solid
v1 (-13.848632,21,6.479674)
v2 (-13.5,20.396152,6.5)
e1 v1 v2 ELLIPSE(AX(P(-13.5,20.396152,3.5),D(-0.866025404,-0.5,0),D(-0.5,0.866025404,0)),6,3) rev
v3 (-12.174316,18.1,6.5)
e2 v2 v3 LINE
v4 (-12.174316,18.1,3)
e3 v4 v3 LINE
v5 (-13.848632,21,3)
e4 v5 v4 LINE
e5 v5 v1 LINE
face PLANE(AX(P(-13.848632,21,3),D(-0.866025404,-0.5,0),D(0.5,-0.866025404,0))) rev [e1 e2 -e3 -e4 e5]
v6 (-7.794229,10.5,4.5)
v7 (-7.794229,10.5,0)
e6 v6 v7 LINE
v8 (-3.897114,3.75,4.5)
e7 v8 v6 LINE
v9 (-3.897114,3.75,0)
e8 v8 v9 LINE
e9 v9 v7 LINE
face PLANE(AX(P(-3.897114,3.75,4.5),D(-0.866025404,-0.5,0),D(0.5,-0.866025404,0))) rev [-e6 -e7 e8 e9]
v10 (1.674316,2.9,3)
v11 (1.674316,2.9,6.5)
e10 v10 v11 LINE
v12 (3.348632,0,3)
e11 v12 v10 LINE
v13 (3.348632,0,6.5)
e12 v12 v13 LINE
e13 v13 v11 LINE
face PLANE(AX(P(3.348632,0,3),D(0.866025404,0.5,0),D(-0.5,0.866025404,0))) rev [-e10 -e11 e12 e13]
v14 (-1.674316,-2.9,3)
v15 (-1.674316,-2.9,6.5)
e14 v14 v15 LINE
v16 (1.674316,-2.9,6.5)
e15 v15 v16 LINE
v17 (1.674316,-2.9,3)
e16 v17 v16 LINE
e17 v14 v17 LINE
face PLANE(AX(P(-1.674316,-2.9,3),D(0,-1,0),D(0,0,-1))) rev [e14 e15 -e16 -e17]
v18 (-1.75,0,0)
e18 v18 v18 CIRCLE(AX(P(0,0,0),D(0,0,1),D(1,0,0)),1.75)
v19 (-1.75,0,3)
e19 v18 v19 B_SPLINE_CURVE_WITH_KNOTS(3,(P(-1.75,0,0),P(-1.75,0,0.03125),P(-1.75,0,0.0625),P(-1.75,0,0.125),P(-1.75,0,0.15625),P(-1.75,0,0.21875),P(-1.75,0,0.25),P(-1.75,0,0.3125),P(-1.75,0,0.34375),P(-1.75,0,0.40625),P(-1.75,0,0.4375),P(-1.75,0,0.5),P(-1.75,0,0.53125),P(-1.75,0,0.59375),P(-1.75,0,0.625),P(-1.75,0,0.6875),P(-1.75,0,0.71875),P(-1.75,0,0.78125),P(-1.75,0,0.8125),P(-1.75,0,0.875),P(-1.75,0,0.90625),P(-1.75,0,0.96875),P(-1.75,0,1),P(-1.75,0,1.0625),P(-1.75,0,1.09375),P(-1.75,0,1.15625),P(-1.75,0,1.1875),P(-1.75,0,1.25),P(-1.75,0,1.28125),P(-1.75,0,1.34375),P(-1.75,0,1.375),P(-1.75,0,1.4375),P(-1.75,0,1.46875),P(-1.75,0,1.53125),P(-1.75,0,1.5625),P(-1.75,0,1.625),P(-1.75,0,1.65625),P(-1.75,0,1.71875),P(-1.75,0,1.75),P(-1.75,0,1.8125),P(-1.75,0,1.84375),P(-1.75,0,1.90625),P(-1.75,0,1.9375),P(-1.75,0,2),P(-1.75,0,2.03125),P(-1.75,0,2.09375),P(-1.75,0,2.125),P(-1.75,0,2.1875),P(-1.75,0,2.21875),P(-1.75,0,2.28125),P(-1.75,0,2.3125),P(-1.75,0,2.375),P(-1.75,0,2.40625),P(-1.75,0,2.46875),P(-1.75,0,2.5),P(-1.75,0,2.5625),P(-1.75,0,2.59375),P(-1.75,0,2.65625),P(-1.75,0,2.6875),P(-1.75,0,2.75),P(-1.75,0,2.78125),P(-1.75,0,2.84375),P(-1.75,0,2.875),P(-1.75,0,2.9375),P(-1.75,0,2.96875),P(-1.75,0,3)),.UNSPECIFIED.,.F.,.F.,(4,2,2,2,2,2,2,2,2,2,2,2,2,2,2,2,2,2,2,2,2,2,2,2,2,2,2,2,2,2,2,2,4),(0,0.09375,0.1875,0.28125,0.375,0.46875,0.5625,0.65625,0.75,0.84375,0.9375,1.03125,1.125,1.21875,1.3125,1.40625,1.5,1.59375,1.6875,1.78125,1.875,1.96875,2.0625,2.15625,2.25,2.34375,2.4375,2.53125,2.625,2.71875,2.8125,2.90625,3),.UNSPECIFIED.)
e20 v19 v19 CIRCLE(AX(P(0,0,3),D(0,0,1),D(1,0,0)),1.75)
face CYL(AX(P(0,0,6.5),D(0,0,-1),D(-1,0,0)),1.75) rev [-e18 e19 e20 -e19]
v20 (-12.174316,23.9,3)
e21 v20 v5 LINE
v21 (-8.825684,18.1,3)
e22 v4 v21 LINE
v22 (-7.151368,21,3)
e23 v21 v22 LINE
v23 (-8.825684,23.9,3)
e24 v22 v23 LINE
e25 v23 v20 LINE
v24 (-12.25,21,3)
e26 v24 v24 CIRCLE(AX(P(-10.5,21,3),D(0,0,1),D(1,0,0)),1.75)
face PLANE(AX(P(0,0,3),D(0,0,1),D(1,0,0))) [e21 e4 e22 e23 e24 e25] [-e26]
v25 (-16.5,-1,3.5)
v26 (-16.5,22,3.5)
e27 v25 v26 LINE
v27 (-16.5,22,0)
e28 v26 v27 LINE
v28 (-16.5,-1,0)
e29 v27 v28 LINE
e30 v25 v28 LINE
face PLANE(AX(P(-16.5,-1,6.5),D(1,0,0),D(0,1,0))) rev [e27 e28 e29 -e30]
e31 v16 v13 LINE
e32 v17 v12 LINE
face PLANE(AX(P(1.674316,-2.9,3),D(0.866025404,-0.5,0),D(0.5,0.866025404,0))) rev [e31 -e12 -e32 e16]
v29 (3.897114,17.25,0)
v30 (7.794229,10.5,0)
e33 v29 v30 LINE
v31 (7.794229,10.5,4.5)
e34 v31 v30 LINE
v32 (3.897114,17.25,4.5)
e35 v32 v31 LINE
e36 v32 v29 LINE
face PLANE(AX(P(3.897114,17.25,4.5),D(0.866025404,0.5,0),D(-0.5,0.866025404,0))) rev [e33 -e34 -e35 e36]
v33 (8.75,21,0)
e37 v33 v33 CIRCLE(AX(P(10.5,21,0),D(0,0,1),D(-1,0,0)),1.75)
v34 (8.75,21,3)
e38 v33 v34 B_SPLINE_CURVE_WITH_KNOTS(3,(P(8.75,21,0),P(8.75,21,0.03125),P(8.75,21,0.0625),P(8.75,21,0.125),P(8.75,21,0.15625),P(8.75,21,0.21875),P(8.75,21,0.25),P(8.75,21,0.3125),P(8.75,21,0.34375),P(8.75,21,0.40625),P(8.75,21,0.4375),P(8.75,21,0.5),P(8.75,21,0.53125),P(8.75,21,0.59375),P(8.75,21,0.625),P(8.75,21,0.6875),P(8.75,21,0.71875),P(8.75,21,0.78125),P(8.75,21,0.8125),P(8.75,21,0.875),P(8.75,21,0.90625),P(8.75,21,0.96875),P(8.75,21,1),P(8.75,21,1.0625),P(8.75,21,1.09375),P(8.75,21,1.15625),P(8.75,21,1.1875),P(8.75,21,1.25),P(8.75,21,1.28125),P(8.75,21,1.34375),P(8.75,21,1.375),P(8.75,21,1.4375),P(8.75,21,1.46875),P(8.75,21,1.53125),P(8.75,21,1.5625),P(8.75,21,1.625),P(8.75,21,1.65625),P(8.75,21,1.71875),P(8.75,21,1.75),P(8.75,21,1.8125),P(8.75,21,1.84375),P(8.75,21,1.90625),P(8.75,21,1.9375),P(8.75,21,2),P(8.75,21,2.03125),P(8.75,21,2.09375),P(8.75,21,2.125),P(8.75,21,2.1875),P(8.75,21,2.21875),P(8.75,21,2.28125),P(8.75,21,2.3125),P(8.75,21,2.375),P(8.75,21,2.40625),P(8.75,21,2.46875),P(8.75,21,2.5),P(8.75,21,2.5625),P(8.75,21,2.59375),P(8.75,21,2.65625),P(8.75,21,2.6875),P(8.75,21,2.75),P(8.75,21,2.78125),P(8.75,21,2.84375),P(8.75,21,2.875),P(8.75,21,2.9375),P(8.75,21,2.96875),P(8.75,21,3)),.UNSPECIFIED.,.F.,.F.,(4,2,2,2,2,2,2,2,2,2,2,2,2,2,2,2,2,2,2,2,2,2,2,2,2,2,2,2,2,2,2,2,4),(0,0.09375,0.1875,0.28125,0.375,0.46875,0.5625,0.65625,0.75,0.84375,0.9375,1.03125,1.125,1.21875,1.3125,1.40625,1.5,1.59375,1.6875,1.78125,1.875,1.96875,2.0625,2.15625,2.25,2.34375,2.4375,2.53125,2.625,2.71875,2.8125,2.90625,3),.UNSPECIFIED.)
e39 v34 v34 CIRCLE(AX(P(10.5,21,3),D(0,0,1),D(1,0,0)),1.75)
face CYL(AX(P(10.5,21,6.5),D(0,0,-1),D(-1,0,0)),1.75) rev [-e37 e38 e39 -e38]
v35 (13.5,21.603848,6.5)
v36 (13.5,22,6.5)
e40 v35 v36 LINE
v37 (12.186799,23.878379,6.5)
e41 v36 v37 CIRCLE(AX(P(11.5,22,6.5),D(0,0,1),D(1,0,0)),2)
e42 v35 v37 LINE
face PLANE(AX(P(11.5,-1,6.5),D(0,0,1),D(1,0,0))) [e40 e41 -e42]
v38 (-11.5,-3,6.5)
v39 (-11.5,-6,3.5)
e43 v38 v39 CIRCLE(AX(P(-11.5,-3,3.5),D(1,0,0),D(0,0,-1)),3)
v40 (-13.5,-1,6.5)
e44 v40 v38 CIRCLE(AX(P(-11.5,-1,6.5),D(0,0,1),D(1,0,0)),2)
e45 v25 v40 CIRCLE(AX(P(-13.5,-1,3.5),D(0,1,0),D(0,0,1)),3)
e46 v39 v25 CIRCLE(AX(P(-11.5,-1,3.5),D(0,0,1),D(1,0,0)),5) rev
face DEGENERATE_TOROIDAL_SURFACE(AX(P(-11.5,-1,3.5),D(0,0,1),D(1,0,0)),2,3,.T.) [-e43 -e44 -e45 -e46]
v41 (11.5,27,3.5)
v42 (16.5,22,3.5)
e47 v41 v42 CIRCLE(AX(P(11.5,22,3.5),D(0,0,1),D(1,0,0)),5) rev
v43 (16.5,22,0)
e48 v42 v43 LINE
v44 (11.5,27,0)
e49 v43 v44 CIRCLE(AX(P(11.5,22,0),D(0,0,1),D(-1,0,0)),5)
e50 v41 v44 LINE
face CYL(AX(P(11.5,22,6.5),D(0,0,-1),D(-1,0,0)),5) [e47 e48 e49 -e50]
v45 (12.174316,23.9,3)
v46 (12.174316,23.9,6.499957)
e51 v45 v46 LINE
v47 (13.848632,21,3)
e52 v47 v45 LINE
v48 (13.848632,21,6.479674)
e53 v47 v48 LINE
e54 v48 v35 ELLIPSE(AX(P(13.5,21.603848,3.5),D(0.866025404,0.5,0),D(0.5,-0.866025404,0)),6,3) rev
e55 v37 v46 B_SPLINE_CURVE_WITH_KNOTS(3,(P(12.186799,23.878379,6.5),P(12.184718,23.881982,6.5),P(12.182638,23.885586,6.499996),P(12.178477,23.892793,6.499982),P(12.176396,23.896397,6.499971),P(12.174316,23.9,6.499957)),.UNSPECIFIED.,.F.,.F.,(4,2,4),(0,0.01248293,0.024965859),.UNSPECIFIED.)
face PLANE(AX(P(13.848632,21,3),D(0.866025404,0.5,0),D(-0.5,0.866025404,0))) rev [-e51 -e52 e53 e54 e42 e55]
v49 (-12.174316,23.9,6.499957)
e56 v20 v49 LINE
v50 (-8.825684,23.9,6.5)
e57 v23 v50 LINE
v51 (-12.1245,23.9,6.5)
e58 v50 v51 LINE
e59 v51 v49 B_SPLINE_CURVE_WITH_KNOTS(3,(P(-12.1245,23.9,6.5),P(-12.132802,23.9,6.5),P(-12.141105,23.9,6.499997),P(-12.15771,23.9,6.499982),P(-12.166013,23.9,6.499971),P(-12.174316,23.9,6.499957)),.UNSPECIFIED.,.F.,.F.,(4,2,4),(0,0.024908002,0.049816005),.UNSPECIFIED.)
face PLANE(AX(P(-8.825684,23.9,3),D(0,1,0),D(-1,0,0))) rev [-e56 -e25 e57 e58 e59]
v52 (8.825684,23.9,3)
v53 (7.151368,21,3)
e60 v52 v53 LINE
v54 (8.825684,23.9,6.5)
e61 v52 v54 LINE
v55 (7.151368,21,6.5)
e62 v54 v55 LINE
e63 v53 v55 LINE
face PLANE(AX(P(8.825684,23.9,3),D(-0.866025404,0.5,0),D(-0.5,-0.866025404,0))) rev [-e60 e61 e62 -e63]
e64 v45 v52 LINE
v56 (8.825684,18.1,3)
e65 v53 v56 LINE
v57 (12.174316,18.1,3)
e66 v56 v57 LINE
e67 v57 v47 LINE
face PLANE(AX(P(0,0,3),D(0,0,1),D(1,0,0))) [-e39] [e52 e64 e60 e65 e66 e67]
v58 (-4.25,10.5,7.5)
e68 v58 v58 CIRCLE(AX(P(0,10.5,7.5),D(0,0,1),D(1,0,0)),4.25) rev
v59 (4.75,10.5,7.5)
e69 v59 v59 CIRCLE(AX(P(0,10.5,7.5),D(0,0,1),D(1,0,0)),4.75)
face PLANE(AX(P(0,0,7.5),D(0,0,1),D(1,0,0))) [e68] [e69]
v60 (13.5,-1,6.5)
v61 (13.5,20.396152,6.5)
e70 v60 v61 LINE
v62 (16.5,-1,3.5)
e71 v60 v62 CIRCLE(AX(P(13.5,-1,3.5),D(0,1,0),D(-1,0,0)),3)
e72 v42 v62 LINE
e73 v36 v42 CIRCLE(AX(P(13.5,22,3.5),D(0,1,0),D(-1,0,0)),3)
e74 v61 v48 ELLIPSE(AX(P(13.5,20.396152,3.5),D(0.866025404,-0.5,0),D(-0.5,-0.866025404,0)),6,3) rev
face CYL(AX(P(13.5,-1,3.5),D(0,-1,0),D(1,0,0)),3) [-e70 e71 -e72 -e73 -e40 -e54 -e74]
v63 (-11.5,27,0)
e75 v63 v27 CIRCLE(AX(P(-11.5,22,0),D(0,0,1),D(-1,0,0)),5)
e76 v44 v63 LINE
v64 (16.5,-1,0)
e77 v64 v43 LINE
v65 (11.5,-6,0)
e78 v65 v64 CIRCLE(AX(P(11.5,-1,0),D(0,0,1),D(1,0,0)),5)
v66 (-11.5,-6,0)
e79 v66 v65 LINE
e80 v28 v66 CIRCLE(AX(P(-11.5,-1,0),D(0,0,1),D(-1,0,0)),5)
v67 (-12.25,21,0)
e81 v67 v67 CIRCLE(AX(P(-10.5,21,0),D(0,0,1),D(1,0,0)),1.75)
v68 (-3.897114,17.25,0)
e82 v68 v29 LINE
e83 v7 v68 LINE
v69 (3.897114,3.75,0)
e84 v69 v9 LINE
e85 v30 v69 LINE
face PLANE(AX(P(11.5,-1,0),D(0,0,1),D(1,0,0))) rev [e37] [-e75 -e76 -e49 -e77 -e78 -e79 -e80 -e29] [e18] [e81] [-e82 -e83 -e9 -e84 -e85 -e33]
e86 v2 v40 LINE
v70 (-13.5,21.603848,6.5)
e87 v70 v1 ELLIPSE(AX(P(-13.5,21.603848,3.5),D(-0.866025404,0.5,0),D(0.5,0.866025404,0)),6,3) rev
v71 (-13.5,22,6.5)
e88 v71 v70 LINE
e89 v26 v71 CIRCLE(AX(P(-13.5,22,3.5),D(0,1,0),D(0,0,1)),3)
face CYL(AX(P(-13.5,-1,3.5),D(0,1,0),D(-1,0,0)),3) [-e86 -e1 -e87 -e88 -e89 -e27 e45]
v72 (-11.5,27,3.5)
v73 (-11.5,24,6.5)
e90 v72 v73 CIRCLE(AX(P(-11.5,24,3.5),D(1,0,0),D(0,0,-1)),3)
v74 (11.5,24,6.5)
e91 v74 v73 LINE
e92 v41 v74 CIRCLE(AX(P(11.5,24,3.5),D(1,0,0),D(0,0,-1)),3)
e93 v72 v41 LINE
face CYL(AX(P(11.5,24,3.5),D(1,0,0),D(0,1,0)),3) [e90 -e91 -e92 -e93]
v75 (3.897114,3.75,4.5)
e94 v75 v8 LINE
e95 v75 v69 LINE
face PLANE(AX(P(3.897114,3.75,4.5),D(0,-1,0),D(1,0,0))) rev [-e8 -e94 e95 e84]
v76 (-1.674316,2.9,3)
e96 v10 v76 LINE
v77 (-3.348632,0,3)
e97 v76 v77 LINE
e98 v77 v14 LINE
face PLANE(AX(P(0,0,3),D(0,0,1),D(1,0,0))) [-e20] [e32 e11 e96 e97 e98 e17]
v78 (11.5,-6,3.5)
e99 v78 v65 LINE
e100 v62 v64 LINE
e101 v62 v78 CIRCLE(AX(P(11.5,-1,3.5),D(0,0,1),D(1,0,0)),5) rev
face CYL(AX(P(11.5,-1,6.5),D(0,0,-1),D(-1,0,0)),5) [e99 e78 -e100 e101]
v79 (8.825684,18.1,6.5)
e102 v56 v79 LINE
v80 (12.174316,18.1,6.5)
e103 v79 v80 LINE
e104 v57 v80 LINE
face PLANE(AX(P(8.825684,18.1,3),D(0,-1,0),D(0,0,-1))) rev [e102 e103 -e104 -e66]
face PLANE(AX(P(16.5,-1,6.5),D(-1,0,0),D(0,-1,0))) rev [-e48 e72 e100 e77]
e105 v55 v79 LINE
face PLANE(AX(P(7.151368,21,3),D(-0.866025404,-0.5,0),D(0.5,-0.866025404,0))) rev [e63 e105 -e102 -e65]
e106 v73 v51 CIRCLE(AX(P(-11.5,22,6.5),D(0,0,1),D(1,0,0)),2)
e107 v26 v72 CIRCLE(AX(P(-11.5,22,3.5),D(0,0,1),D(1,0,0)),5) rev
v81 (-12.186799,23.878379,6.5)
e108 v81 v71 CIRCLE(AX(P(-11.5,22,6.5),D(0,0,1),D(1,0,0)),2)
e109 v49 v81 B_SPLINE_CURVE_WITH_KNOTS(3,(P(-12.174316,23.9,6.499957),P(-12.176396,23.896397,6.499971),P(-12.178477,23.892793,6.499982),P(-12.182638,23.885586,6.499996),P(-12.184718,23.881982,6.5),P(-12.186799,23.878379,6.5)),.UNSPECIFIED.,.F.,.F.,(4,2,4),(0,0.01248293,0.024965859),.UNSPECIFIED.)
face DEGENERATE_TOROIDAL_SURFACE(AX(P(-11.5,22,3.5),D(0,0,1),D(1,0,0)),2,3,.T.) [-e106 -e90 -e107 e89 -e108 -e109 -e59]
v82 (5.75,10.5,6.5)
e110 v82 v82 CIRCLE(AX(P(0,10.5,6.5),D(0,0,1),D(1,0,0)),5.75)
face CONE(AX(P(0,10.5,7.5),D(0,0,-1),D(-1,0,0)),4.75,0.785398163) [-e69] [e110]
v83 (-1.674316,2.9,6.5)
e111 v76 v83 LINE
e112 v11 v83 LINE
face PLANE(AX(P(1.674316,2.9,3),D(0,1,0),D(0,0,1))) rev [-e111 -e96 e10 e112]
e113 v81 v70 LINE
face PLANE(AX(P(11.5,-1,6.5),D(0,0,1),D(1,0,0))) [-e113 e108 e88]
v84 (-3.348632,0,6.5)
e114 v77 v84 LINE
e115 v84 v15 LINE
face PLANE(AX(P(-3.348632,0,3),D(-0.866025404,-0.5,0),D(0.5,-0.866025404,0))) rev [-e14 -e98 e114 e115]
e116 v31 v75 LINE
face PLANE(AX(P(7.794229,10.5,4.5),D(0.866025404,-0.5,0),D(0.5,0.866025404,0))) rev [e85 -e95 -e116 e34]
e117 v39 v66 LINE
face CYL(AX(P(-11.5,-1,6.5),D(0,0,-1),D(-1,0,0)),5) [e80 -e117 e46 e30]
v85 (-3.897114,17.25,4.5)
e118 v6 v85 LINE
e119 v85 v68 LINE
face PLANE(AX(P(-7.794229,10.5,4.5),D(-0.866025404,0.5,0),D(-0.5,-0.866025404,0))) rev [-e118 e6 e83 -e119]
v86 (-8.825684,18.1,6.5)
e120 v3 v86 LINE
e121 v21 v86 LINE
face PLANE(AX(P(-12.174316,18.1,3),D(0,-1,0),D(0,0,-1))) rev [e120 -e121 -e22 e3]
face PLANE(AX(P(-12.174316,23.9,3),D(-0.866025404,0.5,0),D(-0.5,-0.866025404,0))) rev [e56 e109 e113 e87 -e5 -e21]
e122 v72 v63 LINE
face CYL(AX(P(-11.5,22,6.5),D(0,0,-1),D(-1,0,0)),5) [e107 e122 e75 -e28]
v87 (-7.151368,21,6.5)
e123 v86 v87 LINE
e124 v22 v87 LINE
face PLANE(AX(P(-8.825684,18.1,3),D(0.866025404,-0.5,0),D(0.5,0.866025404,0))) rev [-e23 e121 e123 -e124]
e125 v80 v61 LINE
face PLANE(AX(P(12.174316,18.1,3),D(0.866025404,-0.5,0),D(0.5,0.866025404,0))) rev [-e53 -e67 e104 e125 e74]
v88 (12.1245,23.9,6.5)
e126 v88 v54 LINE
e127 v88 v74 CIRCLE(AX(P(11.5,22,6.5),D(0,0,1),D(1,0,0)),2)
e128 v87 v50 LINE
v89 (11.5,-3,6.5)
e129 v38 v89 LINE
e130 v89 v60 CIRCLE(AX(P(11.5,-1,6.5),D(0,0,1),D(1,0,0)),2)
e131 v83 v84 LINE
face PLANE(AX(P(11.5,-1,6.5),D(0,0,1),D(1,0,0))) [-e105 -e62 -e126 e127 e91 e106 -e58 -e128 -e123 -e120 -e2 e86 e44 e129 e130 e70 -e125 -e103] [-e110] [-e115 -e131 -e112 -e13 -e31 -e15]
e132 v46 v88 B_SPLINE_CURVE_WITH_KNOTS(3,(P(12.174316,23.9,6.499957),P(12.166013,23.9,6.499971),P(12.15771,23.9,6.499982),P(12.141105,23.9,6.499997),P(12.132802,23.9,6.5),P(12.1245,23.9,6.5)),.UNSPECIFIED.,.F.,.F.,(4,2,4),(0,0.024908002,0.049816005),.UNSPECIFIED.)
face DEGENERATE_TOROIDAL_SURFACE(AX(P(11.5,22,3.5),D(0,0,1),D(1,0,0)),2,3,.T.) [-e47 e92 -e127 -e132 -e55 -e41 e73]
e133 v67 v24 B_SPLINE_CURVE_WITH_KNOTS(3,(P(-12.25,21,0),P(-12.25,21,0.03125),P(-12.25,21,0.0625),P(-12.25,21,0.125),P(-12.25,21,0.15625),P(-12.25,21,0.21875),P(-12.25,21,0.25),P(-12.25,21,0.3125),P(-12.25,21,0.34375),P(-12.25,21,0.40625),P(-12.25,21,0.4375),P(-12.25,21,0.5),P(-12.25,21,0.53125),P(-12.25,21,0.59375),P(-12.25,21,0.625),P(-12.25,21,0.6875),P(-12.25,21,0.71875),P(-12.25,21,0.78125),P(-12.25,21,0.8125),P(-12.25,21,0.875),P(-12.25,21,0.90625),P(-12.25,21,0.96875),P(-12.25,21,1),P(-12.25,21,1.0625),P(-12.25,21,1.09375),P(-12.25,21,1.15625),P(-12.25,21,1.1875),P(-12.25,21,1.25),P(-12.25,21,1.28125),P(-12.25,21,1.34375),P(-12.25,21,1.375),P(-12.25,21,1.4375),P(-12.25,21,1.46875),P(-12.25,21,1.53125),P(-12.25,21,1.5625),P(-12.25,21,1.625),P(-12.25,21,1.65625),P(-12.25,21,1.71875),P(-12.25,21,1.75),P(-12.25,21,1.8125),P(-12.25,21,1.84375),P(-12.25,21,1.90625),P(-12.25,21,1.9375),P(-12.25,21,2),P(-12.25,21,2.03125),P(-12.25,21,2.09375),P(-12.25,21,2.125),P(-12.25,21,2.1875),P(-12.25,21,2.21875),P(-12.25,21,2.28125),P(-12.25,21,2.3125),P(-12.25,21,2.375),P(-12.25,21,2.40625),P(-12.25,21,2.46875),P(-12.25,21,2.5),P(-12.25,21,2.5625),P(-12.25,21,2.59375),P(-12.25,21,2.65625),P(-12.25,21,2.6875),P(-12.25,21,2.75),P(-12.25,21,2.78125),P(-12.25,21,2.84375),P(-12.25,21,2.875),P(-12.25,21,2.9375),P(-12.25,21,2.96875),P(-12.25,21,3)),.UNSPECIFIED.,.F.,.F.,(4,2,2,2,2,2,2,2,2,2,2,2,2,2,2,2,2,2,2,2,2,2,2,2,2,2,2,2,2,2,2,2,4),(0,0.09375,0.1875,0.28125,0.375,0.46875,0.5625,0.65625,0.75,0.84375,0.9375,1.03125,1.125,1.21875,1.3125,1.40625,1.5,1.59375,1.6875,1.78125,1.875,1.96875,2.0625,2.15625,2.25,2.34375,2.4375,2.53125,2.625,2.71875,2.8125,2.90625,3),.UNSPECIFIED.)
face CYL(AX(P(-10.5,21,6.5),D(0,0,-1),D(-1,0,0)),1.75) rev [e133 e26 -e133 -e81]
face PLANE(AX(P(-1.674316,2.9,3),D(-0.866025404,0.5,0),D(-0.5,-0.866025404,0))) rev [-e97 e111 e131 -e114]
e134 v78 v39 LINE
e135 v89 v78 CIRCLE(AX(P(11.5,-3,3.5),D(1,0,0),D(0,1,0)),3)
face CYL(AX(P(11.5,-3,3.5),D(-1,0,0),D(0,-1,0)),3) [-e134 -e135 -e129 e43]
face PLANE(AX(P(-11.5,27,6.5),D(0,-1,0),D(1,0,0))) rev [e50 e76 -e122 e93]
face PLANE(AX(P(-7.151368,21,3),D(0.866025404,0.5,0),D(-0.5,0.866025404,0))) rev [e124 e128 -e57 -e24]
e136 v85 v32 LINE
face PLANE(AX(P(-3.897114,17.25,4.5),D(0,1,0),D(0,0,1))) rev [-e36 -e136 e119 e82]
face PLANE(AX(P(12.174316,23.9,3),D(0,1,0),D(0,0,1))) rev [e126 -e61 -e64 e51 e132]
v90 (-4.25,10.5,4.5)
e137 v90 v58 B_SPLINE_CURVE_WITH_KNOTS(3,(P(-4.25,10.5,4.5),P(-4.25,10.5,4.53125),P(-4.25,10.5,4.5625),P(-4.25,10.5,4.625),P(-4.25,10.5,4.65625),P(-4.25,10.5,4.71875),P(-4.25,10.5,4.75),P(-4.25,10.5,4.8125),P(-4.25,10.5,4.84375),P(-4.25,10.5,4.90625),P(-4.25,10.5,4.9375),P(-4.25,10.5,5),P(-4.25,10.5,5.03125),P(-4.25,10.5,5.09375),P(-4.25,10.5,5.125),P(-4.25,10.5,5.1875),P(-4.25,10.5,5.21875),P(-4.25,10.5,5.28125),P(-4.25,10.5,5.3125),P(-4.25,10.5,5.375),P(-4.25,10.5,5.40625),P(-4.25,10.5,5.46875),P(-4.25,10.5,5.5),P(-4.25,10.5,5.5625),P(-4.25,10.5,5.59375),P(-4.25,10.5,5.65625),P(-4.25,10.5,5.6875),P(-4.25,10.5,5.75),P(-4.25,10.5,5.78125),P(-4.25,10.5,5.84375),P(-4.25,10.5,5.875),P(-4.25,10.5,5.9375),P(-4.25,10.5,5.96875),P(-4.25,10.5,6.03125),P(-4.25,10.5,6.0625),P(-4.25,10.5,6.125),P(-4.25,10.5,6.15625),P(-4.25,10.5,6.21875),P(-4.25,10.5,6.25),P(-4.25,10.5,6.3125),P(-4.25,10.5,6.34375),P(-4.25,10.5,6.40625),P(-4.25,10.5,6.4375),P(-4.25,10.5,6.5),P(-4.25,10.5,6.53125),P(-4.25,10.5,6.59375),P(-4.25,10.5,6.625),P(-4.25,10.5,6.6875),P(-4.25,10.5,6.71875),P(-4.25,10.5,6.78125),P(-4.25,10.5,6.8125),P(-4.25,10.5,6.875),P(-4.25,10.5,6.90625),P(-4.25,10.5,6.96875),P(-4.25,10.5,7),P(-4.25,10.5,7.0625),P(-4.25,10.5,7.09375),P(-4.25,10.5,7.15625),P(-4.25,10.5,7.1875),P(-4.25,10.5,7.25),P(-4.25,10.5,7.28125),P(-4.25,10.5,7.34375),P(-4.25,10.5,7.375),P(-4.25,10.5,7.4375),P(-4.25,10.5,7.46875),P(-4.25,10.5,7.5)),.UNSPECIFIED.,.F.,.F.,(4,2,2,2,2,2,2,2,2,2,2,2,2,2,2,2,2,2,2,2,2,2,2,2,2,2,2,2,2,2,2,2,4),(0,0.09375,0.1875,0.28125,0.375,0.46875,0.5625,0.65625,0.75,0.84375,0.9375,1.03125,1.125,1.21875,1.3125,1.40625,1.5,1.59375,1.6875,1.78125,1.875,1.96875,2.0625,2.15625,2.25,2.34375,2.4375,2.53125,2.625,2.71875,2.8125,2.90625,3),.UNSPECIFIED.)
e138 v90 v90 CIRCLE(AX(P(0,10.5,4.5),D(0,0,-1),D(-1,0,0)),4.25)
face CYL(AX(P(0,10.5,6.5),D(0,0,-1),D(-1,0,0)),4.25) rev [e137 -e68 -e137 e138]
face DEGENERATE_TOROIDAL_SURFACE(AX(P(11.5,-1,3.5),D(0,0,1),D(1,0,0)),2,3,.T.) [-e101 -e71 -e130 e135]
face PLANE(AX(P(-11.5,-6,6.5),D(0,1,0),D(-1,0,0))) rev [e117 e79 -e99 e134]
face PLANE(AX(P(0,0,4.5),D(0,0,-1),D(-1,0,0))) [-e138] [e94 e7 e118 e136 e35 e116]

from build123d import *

# Parameters (mm, degrees)
ESBO_O1_R                = 1.75
RESSALTO_EXTRUS_O1_DEPTH = 6.5
CORTE_EXTRUS_O1_DEPTH    = 3.5
CORTE_EXTRUS_O2_DEPTH    = 4.5
ESBO_O3_3_R              = 4.25
CORTE_EXTRUS_O3_DEPTH    = 33.30325061
ESBO_O4_R                = 5.75
ESBO_O4_R_2              = 4.25
RESSALTO_EXTRUS_O2_DEPTH = 1
CHANFRO1_SIZE            = 1
FILETE1_R                = 3


# Some blends are built 0.0001 mm under size
with BuildPart() as part:
    # Esboço1 → Ressalto-extrusão1 (new body)
    with BuildSketch(Plane.XY):
        with BuildLine():
            Line((-11.5, -6), (11.5, -6))
            ThreePointArc((11.5, -6), (15.035533906, -4.535533906), (16.5, -1))
            Line((16.5, -1), (16.5, 22))
            ThreePointArc((16.5, 22), (15.035533906, 25.535533906), (11.5, 27))
            Line((11.5, 27), (-11.5, 27))
            ThreePointArc((-11.5, 27), (-15.035533906, 25.535533906), (-16.5, 22))
            Line((-16.5, 22), (-16.5, -1))
            ThreePointArc((-16.5, -1), (-15.035533906, -4.535533906), (-11.5, -6))
        make_face()
        with Locations(Location((0, 0, 0), (0, 0, 180))):
            Circle(ESBO_O1_R, mode=Mode.SUBTRACT)
        with Locations(Location((-10.5, 21, 0), (0, 0, 180))):
            Circle(ESBO_O1_R, mode=Mode.SUBTRACT)
        with Locations(Location((10.5, 21, 0), (0, 0, 180))):
            Circle(ESBO_O1_R, mode=Mode.SUBTRACT)
    extrude(amount=RESSALTO_EXTRUS_O1_DEPTH)

    # Esboço2 → Corte-extrusão1 (cut)
    with BuildSketch(Plane.XY.offset(6.5)):
        Polygon((-12.174315781, 18.1), (-8.825684219, 18.1), (-7.151368439, 21), (-8.825684219, 23.9), (-12.174315781, 23.9), (-13.848631561, 21), align=None)
        Polygon((8.825684219, 18.1), (12.174315781, 18.1), (13.848631561, 21), (12.174315781, 23.9), (8.825684219, 23.9), (7.151368439, 21), align=None)
        Polygon((-1.674315781, 2.9), (-3.348631561, 0), (-1.674315781, -2.9), (1.674315781, -2.9), (3.348631561, 0), (1.674315781, 2.9), align=None)
    extrude(amount=-CORTE_EXTRUS_O1_DEPTH, mode=Mode.SUBTRACT)

    # Esboço3 → Corte-extrusão2 (cut)
    with BuildSketch(Plane(origin=(0, 0, 0), x_dir=(-1, 0, 0), z_dir=(0, 0, -1))):
        Polygon((3.897114317, 17.25), (-3.897114317, 17.25), (-7.794228634, 10.5), (-3.897114317, 3.75), (3.897114317, 3.75), (7.794228634, 10.5), align=None)
    extrude(amount=-CORTE_EXTRUS_O2_DEPTH, mode=Mode.SUBTRACT)

    # Esboço3<3> → Corte-extrusão3 (cut, through all)
    with BuildSketch(Plane(origin=(0, 0, 0), x_dir=(-1, 0, 0), z_dir=(0, 0, -1))):
        with Locations((0, 10.5)):
            Circle(ESBO_O3_3_R)
    extrude(amount=-CORTE_EXTRUS_O3_DEPTH, mode=Mode.SUBTRACT)

    # Esboço4 → Ressalto-extrusão2 (add)
    with BuildSketch(Plane.XY.offset(6.5)):
        with Locations((0, 10.5)):
            Circle(ESBO_O4_R)
        with Locations(Location((0, 10.5, 0), (0, 0, 180))):
            Circle(ESBO_O4_R_2, mode=Mode.SUBTRACT)
    extrude(amount=RESSALTO_EXTRUS_O2_DEPTH)

    # Chanfro1
    chanfro1_edges = [part.edges().sort_by_distance(p)[0] for p in [
        (-5.75, 10.5, 7.5),
    ]]
    chamfer(chanfro1_edges, length=CHANFRO1_SIZE - 0.0001)  # a hair under: the kernel refuses the full size

    # Filete1
    # the kernel refuses this fillet: 3 mm, written as the material it takes off along each edge
    with BuildSketch(Plane(origin=(11.5, 22, 6.5), x_dir=(1, 0, 0), z_dir=(0, -1, 0))) as filete1_piece_1:
        with BuildLine():
            CenterArc((5 - FILETE1_R, -FILETE1_R), FILETE1_R, 0, 90)
            Line((5, -FILETE1_R), (5, 0))
            Line((5, 0), (5 - FILETE1_R, 0))
        make_face()
    revolve(axis=Axis((11.5, 22, 6.5), (0, 0, 1)), revolution_arc=90, mode=Mode.SUBTRACT)
    with BuildSketch(Plane(origin=(11.5, 27, 6.5), x_dir=(0, -1, 0), z_dir=(-1, 0, 0)), Plane(origin=(-16.5, 22, 6.5), x_dir=(1, 0, 0), z_dir=(0, -1, 0)), Plane(origin=(-11.5, -6, 6.5), x_dir=(0, 1, 0), z_dir=(1, 0, 0)), Plane(origin=(16.5, -1, 6.5), x_dir=(-1, 0, 0), z_dir=(0, 1, 0))) as filete1_piece_2:
        with BuildLine():
            CenterArc((FILETE1_R, -FILETE1_R), FILETE1_R, 90, 90)
            Line((0, -FILETE1_R), (0, 0))
            Line((0, 0), (FILETE1_R, 0))
        make_face()
    extrude(amount=23, mode=Mode.SUBTRACT)
    with BuildSketch(Plane(origin=(-11.5, 22, 6.5), x_dir=(0, 1, 0), z_dir=(1, 0, 0))) as filete1_piece_3:
        with BuildLine():
            CenterArc((5 - FILETE1_R, -FILETE1_R), FILETE1_R, 0, 90)
            Line((5, -FILETE1_R), (5, 0))
            Line((5, 0), (5 - FILETE1_R, 0))
        make_face()
    revolve(axis=Axis((-11.5, 22, 6.5), (0, 0, 1)), revolution_arc=90, mode=Mode.SUBTRACT)
    with BuildSketch(Plane(origin=(-11.5, -1, 6.5), x_dir=(-1, 0, 0), z_dir=(0, 1, 0))) as filete1_piece_4:
        with BuildLine():
            CenterArc((5 - FILETE1_R, -FILETE1_R), FILETE1_R, 0, 90)
            Line((5, -FILETE1_R), (5, 0))
            Line((5, 0), (5 - FILETE1_R, 0))
        make_face()
    revolve(axis=Axis((-11.5, -1, 6.5), (0, 0, 1)), revolution_arc=90, mode=Mode.SUBTRACT)
    with BuildSketch(Plane(origin=(11.5, -1, 6.5), x_dir=(0, -1, 0), z_dir=(-1, 0, 0))) as filete1_piece_5:
        with BuildLine():
            CenterArc((5 - FILETE1_R, -FILETE1_R), FILETE1_R, 0, 90)
            Line((5, -FILETE1_R), (5, 0))
            Line((5, 0), (5 - FILETE1_R, 0))
        make_face()
    revolve(axis=Axis((11.5, -1, 6.5), (0, 0, 1)), revolution_arc=90, mode=Mode.SUBTRACT)


solid = part.part
